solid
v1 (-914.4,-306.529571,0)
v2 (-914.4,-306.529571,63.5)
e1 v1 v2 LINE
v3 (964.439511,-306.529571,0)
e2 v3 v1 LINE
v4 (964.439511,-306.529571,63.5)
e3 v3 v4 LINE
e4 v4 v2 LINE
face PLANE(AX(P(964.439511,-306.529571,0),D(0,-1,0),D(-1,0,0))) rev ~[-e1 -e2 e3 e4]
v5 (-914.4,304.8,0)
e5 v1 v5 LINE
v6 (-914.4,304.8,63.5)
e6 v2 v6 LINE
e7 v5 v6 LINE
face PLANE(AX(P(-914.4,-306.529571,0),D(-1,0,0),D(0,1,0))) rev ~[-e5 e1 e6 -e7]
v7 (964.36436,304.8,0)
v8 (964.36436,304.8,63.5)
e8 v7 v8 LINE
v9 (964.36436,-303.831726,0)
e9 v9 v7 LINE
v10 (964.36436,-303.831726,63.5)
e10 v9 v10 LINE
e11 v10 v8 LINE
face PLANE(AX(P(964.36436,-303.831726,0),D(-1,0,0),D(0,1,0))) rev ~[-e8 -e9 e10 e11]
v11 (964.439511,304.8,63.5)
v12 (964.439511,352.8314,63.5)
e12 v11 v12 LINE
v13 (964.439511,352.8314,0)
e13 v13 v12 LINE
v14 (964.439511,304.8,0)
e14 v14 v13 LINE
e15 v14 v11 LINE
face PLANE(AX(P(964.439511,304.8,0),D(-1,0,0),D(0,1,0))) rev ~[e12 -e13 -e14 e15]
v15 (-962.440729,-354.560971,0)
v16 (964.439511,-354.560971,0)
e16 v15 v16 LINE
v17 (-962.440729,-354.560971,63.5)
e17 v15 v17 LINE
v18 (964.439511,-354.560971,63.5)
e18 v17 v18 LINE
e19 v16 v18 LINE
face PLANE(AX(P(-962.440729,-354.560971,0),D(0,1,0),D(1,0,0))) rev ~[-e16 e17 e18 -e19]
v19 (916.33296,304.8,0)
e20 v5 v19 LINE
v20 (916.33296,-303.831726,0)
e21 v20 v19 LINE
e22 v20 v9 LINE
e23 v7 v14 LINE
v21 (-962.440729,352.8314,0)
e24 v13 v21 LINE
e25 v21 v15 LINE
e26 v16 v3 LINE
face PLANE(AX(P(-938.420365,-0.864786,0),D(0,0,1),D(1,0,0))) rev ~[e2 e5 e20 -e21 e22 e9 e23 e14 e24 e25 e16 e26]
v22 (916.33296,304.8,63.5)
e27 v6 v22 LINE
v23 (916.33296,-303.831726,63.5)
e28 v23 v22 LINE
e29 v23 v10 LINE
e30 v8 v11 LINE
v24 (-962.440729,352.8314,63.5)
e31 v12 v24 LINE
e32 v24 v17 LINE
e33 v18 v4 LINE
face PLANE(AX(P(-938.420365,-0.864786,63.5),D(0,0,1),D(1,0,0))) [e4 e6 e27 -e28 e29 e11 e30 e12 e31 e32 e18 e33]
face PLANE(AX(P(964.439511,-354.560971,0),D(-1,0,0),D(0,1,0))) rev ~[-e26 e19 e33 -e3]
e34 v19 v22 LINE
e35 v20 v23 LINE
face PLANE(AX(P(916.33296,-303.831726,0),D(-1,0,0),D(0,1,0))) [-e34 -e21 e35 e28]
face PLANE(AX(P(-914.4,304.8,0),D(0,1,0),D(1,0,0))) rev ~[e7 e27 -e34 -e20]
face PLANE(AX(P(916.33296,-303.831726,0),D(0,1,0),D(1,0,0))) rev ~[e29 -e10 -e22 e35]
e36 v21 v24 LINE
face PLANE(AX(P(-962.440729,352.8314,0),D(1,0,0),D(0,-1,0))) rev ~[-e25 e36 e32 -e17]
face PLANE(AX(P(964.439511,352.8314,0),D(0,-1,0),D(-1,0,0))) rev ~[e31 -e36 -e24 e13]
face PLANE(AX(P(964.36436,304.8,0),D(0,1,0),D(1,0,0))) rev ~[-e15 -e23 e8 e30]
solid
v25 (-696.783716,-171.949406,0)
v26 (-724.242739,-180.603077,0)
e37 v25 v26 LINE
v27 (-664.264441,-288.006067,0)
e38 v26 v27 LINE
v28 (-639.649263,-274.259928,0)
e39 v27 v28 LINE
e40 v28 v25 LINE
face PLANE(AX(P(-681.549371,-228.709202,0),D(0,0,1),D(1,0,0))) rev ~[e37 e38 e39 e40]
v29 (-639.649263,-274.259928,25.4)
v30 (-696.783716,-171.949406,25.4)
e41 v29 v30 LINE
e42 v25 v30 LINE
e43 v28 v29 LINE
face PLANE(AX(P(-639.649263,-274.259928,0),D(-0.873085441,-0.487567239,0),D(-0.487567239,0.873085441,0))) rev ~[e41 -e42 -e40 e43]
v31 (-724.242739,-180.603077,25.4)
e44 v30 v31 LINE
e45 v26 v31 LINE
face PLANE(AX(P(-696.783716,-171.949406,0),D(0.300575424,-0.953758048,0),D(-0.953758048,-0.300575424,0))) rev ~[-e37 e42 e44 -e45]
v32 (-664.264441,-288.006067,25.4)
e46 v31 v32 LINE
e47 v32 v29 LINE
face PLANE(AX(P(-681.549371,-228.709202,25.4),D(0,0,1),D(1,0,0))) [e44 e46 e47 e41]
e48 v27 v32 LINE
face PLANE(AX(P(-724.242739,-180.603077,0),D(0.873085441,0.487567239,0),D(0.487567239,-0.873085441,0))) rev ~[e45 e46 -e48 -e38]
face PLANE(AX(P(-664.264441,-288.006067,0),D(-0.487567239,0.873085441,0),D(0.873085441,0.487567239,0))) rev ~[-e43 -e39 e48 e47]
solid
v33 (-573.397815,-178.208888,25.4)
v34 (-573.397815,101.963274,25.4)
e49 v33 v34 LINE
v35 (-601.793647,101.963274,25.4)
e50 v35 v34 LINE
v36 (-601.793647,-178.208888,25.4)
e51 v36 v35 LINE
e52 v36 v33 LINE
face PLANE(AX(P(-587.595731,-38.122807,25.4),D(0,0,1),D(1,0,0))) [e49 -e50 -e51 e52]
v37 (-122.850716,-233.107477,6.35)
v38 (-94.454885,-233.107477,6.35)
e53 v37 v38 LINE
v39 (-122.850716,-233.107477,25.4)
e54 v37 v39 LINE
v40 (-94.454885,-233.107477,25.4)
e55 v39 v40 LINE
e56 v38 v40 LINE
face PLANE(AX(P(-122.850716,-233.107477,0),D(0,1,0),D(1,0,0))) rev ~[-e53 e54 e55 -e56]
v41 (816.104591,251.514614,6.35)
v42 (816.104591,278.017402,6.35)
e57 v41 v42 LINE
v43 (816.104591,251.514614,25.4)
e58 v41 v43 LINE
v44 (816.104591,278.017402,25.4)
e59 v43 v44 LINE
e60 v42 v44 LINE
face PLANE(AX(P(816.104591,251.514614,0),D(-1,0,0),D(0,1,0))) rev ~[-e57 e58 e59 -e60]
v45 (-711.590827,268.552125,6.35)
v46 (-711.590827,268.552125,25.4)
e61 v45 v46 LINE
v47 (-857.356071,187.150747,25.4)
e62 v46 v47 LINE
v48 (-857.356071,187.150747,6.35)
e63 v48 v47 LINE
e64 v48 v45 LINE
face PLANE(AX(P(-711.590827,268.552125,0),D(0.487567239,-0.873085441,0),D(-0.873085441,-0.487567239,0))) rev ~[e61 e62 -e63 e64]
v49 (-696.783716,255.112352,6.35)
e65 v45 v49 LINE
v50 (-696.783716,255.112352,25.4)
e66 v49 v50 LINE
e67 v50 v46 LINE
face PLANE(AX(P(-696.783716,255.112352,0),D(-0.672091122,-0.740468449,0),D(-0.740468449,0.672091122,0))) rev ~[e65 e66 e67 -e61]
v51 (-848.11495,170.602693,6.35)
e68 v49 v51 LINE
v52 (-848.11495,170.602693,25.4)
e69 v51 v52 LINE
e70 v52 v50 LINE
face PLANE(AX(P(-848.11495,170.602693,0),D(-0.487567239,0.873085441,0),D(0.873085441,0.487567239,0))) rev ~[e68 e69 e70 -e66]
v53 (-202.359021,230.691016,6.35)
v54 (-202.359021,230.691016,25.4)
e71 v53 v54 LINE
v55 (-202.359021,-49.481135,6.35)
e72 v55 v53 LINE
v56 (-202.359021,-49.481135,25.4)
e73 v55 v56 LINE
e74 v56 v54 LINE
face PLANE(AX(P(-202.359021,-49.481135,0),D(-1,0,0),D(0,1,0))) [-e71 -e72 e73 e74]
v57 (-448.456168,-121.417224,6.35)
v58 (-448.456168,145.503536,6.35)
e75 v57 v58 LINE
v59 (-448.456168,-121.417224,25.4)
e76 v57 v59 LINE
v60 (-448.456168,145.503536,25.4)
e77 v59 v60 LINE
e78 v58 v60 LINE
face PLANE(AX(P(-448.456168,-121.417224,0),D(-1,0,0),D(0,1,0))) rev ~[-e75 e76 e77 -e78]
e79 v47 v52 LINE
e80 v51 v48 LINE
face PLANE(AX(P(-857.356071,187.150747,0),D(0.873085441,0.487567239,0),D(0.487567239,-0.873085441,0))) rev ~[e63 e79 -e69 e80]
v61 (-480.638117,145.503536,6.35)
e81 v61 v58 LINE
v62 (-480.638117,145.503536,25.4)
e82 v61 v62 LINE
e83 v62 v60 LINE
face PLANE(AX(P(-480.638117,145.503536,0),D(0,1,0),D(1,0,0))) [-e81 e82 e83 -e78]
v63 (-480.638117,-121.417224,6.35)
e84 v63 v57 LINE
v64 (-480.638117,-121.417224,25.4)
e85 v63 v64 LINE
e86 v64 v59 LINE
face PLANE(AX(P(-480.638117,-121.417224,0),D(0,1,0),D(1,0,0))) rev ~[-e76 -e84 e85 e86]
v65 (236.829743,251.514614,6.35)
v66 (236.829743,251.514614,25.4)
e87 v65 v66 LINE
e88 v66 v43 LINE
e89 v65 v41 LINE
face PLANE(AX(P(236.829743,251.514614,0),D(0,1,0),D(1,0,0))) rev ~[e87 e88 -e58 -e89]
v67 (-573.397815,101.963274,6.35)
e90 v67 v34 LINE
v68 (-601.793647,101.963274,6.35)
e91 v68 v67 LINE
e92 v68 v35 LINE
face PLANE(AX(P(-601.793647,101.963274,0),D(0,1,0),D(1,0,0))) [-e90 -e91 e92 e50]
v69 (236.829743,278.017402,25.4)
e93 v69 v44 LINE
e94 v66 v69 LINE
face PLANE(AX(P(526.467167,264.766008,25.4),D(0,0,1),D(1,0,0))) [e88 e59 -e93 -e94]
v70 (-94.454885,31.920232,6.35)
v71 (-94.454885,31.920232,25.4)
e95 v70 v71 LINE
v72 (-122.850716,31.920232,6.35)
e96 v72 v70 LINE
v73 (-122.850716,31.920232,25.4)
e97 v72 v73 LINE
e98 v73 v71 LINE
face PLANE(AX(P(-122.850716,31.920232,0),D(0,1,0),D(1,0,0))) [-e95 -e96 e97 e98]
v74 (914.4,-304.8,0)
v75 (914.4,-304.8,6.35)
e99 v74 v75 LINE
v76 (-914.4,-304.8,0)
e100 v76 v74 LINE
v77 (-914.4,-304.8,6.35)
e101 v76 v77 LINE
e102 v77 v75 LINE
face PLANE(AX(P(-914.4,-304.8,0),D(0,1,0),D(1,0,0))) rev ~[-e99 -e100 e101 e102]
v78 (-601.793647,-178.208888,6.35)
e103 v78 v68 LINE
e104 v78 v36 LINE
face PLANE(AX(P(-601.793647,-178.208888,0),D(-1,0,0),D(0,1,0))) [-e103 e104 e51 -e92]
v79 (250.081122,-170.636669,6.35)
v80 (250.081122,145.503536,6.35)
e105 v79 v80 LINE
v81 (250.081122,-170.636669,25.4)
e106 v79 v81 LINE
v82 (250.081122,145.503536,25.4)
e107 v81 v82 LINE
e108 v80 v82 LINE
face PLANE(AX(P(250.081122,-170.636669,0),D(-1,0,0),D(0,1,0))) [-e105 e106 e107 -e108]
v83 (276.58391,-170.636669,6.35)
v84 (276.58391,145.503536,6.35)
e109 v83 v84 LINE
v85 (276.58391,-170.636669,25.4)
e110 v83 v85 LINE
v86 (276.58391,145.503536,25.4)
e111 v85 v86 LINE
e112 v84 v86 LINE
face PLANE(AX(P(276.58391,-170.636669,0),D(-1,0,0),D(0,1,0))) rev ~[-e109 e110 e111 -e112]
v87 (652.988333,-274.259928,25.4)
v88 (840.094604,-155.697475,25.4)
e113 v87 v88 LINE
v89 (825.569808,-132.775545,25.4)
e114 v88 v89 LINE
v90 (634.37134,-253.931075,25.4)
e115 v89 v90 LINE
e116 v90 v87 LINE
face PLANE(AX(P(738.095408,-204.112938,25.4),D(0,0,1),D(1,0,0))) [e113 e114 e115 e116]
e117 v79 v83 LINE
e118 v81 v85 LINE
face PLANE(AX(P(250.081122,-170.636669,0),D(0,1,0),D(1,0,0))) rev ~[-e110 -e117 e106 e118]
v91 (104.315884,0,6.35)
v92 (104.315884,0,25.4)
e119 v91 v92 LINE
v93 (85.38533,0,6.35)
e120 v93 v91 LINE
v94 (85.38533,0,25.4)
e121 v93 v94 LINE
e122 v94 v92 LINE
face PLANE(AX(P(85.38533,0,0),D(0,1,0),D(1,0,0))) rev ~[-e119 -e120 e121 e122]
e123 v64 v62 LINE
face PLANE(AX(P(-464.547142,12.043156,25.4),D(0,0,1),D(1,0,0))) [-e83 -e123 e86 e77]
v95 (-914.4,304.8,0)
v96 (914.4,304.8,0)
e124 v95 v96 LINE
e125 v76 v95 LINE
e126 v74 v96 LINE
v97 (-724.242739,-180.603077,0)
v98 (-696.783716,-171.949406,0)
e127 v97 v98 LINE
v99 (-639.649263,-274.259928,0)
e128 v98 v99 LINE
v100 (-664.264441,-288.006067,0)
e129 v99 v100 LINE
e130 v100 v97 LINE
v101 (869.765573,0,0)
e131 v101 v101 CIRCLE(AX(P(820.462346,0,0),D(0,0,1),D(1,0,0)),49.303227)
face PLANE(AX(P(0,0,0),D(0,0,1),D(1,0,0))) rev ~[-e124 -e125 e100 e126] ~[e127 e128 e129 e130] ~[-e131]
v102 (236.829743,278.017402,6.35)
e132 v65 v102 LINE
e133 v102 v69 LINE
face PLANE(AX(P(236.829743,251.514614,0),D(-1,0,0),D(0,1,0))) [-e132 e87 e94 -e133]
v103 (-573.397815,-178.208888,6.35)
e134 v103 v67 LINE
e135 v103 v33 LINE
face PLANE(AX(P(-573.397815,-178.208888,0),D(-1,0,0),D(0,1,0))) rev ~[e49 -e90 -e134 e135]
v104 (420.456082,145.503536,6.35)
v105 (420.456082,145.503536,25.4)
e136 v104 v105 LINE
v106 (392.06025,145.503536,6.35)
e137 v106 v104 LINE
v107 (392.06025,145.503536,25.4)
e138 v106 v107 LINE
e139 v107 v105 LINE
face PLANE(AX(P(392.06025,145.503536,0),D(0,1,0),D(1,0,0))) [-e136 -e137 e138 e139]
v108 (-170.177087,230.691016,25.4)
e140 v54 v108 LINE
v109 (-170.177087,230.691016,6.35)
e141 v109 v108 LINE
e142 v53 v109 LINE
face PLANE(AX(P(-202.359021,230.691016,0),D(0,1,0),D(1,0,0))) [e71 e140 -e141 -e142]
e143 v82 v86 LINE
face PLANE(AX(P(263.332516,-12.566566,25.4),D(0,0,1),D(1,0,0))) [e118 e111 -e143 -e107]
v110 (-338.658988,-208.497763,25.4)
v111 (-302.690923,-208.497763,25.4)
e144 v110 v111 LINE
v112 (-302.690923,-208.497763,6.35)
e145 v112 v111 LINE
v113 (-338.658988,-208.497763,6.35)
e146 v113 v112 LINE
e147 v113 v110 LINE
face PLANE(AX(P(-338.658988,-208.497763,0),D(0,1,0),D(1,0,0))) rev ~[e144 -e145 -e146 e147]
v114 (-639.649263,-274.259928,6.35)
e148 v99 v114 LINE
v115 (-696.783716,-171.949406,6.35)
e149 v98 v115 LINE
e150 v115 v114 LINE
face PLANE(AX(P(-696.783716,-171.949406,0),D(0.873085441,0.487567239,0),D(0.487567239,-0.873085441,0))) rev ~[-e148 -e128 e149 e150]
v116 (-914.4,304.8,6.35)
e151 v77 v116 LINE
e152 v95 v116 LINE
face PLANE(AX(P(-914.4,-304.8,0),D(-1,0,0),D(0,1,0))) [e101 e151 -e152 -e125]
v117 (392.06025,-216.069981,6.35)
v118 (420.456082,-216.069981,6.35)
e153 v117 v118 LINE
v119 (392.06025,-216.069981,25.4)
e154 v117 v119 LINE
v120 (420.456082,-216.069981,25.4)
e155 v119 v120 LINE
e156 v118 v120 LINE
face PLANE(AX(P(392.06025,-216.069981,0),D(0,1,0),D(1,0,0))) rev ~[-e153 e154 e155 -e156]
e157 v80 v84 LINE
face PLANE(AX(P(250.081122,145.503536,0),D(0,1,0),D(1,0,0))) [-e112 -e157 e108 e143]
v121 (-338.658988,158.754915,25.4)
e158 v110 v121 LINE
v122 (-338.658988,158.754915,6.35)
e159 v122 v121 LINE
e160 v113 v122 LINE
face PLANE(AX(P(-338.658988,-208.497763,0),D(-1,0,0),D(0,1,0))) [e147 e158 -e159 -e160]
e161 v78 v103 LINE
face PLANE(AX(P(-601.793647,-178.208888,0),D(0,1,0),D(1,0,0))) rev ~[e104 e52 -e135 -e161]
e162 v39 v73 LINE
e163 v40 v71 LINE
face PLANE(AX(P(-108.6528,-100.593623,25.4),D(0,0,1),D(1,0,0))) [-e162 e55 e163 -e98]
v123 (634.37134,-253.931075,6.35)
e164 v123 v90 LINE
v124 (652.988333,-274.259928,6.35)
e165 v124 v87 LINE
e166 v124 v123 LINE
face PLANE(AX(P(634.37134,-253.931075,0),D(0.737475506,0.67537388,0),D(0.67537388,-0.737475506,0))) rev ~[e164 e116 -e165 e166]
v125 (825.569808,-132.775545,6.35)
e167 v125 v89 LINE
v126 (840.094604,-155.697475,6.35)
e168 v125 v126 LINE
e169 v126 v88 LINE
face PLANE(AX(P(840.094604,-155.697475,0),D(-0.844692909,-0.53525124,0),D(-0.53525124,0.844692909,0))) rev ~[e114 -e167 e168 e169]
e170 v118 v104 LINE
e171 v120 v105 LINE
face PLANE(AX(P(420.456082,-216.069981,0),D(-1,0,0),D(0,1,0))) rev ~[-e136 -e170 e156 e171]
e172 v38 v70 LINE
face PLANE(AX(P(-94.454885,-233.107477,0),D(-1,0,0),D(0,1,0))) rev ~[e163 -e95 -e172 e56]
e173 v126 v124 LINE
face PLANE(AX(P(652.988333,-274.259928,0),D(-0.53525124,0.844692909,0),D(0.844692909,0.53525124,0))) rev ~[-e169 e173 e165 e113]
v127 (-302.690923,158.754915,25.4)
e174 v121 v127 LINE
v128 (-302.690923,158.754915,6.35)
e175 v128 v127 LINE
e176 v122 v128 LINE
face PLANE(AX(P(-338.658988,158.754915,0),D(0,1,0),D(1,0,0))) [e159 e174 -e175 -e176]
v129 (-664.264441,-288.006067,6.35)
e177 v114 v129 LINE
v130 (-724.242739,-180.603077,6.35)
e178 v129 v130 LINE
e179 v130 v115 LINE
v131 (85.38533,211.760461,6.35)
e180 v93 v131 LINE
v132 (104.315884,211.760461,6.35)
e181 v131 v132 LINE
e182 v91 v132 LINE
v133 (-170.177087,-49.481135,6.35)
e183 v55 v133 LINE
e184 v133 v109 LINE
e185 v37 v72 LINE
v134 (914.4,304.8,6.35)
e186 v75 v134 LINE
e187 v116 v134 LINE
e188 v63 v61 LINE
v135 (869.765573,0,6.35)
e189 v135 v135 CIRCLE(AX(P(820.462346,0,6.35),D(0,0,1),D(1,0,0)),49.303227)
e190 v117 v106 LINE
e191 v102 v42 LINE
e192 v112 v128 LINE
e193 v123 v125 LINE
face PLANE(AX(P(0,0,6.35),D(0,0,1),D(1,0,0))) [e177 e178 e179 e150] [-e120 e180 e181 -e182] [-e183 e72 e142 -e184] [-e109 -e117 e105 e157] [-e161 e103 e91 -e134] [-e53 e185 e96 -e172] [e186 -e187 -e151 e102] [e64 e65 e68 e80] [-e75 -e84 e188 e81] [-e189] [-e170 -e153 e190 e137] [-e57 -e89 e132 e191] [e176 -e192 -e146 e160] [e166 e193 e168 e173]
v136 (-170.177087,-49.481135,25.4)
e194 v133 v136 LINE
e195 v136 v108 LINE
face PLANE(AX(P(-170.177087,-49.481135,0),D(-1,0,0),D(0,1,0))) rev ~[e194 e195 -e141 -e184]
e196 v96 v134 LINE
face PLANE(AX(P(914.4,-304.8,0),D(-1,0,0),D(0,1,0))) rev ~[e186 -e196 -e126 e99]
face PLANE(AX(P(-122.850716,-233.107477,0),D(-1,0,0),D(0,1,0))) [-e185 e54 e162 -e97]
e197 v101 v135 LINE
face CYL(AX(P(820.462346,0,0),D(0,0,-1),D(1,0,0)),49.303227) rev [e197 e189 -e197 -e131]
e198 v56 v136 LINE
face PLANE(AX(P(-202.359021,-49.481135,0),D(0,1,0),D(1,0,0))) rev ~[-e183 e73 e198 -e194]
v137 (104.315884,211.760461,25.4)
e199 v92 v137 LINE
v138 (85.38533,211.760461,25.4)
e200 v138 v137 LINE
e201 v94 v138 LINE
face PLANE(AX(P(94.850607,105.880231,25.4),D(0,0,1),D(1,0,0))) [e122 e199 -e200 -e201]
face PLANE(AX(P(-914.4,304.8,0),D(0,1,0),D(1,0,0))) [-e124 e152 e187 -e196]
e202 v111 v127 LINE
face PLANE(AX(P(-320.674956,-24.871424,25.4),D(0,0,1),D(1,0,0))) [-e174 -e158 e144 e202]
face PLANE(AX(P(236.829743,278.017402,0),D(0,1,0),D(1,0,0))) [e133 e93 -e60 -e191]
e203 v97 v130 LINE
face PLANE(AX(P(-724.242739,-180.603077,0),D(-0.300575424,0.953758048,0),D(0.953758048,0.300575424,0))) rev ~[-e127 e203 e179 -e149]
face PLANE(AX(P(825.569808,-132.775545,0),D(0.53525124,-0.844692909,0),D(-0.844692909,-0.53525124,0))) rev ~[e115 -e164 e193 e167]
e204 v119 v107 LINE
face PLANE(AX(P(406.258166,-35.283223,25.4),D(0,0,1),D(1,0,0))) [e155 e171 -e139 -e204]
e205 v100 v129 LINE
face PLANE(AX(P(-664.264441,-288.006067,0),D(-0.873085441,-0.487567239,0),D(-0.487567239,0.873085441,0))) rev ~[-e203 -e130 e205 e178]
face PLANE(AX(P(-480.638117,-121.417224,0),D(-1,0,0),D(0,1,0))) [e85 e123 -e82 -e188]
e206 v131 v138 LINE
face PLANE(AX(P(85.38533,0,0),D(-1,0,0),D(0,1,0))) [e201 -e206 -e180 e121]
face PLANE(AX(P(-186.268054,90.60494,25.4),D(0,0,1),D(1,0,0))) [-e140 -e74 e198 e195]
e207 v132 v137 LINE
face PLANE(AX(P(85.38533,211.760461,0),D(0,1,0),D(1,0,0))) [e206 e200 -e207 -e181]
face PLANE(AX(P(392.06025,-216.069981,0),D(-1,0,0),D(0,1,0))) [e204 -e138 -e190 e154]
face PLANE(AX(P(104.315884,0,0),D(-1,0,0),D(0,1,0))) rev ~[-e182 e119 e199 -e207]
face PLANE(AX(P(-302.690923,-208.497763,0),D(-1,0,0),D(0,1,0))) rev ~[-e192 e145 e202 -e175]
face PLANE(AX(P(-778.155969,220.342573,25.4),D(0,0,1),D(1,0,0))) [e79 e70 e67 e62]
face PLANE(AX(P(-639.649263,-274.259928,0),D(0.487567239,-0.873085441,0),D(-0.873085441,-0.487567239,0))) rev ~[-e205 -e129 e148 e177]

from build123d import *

# Parameters (mm, degrees)
F2_DEPTH = 25.4
F0_W     = 48.0314
F0_H     = 608.6317263126
F3_DEPTH = 63.5
F0_W_2   = 1828.8
F0_H_2   = 609.6
F0_W_3   = 28.3958315849
F0_H_3   = 280.1721617579
F0_H_4   = 265.0277093053
F0_W_4   = 35.9680652618
F0_H_5   = 367.2526776791
F0_W_5   = 26.5027880669
F0_H_6   = 316.140204668
F0_H_7   = 361.5735173225
F0_W_6   = 32.1819484234
F0_H_8   = 266.9207602739
F0_W_7   = 32.1819335222
F0_H_9   = 280.1721505821
F0_W_8   = 18.93055439
F0_H_10  = 211.7604613304
F0_R     = 49.3032271109
F0_W_9   = 579.2748481035
F0_H_11  = 26.5027880669
F4_DEPTH = 6.35
F5_DEPTH = 25.4
F7_DEPTH = 25.4
F8_DEPTH = 25.4


# Not quite as in the source:
# - the program builds the solid bodies; features that only make, move or delete a surface that nothing else refers to are left out


with BuildPart() as f2:
    # F0 (on Top) → F2 (new body)
    with BuildSketch(Plane.XY):
        Polygon((-724.242739406, -180.6030766776), (-664.2644405365, -288.006067276), (-639.6492631828, -274.2599280315), (-696.7837155241, -171.9494063374), align=None)
    extrude(amount=F2_DEPTH)


with BuildPart() as f3:
    # F0 (on Top) → F3 (new body)
    with BuildSketch(Plane.XY):
        Polygon((-914.4, -306.5295712601), (-914.4, -304.8), (-914.4, 304.8), (-962.4407291412, 304.8), (-962.4407291412, -306.5295712601), align=None)
        Polygon((964.4395112991, -306.5295712601), (-914.4, -306.5295712601), (-962.4407291412, -306.5295712601), (-962.4407291412, -354.5609712601), (964.4395112991, -354.5609712601), align=None)
        Polygon((-962.4407291412, 304.8), (-914.4, 304.8), (914.4, 304.8), (916.3329601288, 304.8), (964.3643601288, 304.8), (964.4395112991, 304.8), (964.4395112991, 352.8314), (-962.4407291412, 352.8314), align=None)
        with Locations((940.3486601288, 0.4841368437)):
            Rectangle(F0_W, F0_H)
    extrude(amount=F3_DEPTH)


with BuildPart() as f4:
    # F0 (on Top) → F4 (new body)
    with BuildSketch(Plane.XY):
        Rectangle(F0_W_2, F0_H_2)
        Polygon((-639.6492631828, -274.2599280315), (-664.2644405365, -288.006067276), (-724.242739406, -180.6030766776), (-696.7837155241, -171.9494063374), align=None, mode=Mode.SUBTRACT)
        with Locations((-587.59573102, -38.1228066981)):
            Rectangle(F0_W_3, F0_H_3, mode=Mode.SUBTRACT)
        with Locations((-108.6528003216, -100.5936227739)):
            Rectangle(F0_W_3, F0_H_4, mode=Mode.SUBTRACT)
        with Locations((-320.6749558449, -24.8714238405)):
            Rectangle(F0_W_4, F0_H_5, mode=Mode.SUBTRACT)
        Polygon((652.9883329754, -274.2599280315), (634.3713402748, -253.9310753345), (825.5698084831, -132.7755451202), (840.0946035245, -155.6974749573), align=None, mode=Mode.SUBTRACT)
        with Locations((263.332515955, -12.5665664673)):
            Rectangle(F0_W_5, F0_H_6, mode=Mode.SUBTRACT)
        with Locations((406.2581658363, -35.2832227945)):
            Rectangle(F0_W_3, F0_H_7, mode=Mode.SUBTRACT)
        with Locations((-464.5471423864, 12.0431557298)):
            Rectangle(F0_W_6, F0_H_8, mode=Mode.SUBTRACT)
        with Locations((-186.2680539489, 90.6049404293)):
            Rectangle(F0_W_7, F0_H_9, mode=Mode.SUBTRACT)
        Polygon((-857.3560714722, 187.1507465839), (-711.5908265114, 268.5521245003), (-696.7837155241, 255.1123515359), (-848.1149500553, 170.6026934488), align=None, mode=Mode.SUBTRACT)
        with Locations((94.8506072164, 105.8802306652)):
            Rectangle(F0_W_8, F0_H_10, mode=Mode.SUBTRACT)
        with Locations((820.462346077, 0)):
            Circle(F0_R, mode=Mode.SUBTRACT)
        with Locations((526.467166841, 264.7660076618)):
            Rectangle(F0_W_9, F0_H_11, mode=Mode.SUBTRACT)
    extrude(amount=F4_DEPTH)

    # F0 (on Top) → F5 (join)
    with BuildSketch(Plane.XY):
        with Locations((-587.59573102, -38.1228066981)):
            Rectangle(F0_W_3, F0_H_3)
        Polygon((-696.7837155241, 255.1123515359), (-711.5908265114, 268.5521245003), (-857.3560714722, 187.1507465839), (-848.1149500553, 170.6026934488), align=None)
        with Locations((-464.5471423864, 12.0431557298)):
            Rectangle(F0_W_6, F0_H_8)
        with Locations((-320.6749558449, -24.8714238405)):
            Rectangle(F0_W_4, F0_H_5)
        with Locations((-186.2680539489, 90.6049404293)):
            Rectangle(F0_W_7, F0_H_9)
        with Locations((-108.6528003216, -100.5936227739)):
            Rectangle(F0_W_3, F0_H_4)
        with Locations((94.8506072164, 105.8802306652)):
            Rectangle(F0_W_8, F0_H_10)
        with Locations((263.332515955, -12.5665664673)):
            Rectangle(F0_W_5, F0_H_6)
        with Locations((406.2581658363, -35.2832227945)):
            Rectangle(F0_W_3, F0_H_7)
    extrude(amount=F5_DEPTH)

    # F0 (on Top) → F7 (join)
    with BuildSketch(Plane.XY):
        with Locations((526.467166841, 264.7660076618)):
            Rectangle(F0_W_9, F0_H_11)
    extrude(amount=F7_DEPTH)

    # F0 (on Top) → F8 (join)
    with BuildSketch(Plane.XY):
        Polygon((825.5698084831, -132.7755451202), (634.3713402748, -253.9310753345), (652.9883329754, -274.2599280315), (840.0946035245, -155.6974749573), align=None)
    extrude(amount=F8_DEPTH)


solid = Compound([f2.part, f3.part, f4.part])
